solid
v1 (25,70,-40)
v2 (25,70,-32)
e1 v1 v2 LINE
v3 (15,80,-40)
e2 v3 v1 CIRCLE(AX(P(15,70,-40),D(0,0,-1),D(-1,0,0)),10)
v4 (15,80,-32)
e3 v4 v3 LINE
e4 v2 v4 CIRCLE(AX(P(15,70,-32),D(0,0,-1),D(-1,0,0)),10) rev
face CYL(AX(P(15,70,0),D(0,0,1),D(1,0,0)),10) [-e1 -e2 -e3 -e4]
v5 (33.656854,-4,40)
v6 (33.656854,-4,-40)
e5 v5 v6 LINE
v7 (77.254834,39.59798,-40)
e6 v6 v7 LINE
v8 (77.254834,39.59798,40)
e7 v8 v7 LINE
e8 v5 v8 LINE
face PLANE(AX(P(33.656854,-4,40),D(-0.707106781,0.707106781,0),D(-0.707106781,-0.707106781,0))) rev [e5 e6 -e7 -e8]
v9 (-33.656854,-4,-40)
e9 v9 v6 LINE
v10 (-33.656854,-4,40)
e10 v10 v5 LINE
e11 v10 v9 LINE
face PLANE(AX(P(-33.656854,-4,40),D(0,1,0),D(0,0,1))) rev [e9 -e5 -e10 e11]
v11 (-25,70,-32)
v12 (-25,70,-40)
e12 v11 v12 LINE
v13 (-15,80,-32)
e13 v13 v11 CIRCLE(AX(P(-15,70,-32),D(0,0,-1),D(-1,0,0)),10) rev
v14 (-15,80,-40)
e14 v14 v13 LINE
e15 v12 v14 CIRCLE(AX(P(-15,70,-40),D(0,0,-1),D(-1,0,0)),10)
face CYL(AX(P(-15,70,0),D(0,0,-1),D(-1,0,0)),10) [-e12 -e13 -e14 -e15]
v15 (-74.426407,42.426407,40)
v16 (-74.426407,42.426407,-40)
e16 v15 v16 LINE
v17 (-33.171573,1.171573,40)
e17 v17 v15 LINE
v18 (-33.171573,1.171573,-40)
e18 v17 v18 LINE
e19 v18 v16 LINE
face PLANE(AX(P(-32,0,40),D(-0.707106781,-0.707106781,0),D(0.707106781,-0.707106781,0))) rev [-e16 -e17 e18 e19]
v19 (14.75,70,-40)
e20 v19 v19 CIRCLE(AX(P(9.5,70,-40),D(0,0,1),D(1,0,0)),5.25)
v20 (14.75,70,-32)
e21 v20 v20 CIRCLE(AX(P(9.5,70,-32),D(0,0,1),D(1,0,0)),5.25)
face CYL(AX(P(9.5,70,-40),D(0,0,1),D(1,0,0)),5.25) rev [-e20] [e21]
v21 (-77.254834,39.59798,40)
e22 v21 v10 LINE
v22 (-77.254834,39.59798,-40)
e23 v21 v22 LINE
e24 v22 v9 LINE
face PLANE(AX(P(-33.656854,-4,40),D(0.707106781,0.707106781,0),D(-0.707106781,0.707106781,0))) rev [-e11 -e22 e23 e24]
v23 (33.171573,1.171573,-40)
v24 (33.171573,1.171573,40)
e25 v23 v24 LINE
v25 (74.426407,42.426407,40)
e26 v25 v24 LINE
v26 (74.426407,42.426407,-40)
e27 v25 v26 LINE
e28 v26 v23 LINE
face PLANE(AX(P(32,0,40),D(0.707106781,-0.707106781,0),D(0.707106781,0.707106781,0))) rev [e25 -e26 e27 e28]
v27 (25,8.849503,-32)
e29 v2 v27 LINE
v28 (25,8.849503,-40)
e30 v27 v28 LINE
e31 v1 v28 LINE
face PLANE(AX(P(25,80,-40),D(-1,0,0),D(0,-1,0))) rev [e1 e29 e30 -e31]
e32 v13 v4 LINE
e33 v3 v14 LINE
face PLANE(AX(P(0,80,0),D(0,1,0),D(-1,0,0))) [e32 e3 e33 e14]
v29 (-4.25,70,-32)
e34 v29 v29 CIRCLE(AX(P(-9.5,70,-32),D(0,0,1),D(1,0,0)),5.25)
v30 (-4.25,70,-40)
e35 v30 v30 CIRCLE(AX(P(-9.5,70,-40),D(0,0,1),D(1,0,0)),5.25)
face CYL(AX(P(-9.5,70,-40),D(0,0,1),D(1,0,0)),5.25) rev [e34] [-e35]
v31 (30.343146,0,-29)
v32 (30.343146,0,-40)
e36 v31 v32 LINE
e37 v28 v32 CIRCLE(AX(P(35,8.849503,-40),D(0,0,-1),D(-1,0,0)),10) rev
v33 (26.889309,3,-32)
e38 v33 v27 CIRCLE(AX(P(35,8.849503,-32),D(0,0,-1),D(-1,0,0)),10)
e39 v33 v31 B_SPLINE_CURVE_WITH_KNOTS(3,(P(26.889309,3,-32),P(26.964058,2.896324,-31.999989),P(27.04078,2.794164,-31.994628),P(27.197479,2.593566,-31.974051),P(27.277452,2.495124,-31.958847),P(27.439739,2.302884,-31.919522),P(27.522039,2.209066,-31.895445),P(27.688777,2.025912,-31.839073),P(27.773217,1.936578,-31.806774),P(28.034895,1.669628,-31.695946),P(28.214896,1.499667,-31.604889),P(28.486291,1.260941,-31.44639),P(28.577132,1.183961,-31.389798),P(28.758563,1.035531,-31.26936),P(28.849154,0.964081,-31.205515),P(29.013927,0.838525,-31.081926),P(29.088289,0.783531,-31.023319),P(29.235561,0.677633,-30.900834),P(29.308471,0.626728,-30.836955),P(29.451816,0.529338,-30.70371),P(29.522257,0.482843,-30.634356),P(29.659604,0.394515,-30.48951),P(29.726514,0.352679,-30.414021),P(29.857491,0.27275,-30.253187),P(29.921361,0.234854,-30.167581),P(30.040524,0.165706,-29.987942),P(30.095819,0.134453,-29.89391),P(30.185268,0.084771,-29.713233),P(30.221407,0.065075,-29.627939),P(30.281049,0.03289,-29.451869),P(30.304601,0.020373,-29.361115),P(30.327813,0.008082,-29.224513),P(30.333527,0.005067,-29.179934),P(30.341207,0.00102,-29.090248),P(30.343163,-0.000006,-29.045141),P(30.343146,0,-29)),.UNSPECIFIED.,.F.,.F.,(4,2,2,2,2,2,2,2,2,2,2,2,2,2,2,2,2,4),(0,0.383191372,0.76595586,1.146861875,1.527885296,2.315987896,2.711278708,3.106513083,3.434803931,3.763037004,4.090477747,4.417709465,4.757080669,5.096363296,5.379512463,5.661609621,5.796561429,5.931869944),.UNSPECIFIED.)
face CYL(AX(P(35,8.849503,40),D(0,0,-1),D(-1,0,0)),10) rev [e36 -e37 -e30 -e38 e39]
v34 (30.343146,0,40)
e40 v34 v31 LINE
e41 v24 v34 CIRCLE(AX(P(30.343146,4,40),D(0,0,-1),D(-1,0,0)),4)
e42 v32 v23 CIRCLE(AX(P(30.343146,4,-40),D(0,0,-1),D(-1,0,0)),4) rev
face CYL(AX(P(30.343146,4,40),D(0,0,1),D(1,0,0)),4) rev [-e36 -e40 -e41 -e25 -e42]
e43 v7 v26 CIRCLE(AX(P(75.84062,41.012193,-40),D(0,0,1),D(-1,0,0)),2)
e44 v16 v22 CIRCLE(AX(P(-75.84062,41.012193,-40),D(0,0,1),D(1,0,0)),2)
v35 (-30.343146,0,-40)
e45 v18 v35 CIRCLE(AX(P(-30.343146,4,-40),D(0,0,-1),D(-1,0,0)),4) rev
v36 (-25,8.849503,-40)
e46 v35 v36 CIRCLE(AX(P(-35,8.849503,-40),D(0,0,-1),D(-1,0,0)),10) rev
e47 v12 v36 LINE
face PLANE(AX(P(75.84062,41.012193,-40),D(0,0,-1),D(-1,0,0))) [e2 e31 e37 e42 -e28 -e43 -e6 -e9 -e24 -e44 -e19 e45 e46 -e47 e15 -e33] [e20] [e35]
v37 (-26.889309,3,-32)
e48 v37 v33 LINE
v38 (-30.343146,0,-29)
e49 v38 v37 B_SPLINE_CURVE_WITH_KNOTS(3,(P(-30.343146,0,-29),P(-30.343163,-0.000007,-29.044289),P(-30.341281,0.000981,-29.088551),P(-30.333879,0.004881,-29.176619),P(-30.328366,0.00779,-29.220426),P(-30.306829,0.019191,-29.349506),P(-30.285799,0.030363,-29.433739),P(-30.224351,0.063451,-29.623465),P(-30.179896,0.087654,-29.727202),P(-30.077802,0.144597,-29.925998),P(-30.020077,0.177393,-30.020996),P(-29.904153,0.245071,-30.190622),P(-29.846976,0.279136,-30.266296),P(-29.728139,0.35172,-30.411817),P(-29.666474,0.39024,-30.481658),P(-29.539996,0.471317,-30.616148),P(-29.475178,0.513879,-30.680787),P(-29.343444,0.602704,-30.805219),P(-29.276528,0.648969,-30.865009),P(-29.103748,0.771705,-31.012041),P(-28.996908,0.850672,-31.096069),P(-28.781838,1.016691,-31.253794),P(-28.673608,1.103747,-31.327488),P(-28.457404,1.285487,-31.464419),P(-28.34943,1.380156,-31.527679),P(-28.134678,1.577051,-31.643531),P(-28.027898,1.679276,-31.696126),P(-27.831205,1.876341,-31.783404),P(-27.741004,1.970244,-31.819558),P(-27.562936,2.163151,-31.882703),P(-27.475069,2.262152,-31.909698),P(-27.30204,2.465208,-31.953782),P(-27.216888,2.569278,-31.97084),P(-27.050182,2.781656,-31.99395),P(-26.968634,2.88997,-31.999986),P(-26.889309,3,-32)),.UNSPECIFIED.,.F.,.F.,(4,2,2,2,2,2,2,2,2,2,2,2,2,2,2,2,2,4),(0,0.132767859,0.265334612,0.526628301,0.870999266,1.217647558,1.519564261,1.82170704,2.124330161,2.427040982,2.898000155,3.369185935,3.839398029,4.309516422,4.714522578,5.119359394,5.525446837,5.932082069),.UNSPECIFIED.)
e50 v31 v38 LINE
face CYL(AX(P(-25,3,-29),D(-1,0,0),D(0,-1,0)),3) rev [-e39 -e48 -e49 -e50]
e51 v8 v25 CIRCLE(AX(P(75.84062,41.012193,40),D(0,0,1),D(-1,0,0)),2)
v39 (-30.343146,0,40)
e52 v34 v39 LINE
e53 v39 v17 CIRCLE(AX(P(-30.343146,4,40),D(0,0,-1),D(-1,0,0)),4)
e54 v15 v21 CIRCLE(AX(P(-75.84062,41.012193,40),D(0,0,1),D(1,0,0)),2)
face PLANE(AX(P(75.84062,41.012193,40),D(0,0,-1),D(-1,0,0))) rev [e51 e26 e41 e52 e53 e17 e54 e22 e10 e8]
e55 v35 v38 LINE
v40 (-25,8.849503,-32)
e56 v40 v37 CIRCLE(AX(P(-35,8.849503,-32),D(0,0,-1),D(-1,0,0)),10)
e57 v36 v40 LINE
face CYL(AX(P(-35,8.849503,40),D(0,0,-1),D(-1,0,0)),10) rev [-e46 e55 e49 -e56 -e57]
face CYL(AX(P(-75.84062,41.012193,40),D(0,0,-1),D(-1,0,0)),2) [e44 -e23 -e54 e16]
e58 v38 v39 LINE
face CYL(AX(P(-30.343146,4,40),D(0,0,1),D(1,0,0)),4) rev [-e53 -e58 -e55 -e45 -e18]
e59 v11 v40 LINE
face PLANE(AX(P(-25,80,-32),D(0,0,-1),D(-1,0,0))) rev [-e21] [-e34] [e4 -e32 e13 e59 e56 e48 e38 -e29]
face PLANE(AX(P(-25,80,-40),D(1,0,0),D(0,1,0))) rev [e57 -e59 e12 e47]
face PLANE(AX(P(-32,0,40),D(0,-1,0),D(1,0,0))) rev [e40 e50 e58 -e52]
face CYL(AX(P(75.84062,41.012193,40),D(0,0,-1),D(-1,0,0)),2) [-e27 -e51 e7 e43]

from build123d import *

# Parameters (mm, degrees)
BOSS_EXTRUDE2_DEPTH = 40
FILLET1_R           = 4
SKETCH3_W           = 50
SKETCH3_H           = 8
BOSS_EXTRUDE3_DEPTH = 80
SKETCH5_R           = 5.25
CUT_EXTRUDE1_DEPTH  = 133.827565624
FILLET2_R           = 10
FILLET3_R           = 3


with BuildPart() as part:
    # Sketch2 → Boss-Extrude2 (new, symmetric)
    with BuildSketch(Plane.XY):
        with BuildLine():
            Line((-32, 0), (32, 0))
            Line((32, 0), (74.426406871, 42.426406871))
            ThreePointArc((74.426406871, 42.426406871), (77.254833996, 42.426406871), (77.254833996, 39.597979746))
            Line((77.254833996, 39.597979746), (33.656854249, -4))
            Line((33.656854249, -4), (-33.656854249, -4))
            Line((-33.656854249, -4), (-77.254833996, 39.597979746))
            ThreePointArc((-77.254833996, 39.597979746), (-77.254833996, 42.426406871), (-74.426406871, 42.426406871))
            Line((-74.426406871, 42.426406871), (-32, 0))
        make_face()
    extrude(amount=BOSS_EXTRUDE2_DEPTH, both=True)

    # Fillet1
    fillet1_edges = [part.edges().sort_by_distance(p)[0] for p in [
        (-32, 0, 0),
        (32, 0, 0),
    ]]
    fillet(fillet1_edges, radius=FILLET1_R)

    # Sketch3 → Boss-Extrude3 (add)
    with BuildSketch(Plane(origin=(0, 0, 0), x_dir=(1, 0, 0), z_dir=(0, 1, 0))):
        with Locations((0, 36)):
            Rectangle(SKETCH3_W, SKETCH3_H)
    extrude(amount=BOSS_EXTRUDE3_DEPTH)

    # Sketch5 → Cut-Extrude1 (cut, through all)
    with BuildSketch(Plane.XY.offset(-32)):
        with Locations((-9.5, 70)):
            Circle(SKETCH5_R)
        with Locations((9.5, 70)):
            Circle(SKETCH5_R)
    extrude(amount=-CUT_EXTRUDE1_DEPTH, mode=Mode.SUBTRACT)

    # Fillet2
    # the kernel refuses this fillet: 10 mm, written as the material it adds along each edge
    with BuildSketch(Plane(origin=(25, 0, -40), x_dir=(1, 0, 0), z_dir=(0, 0, 1)), Plane(origin=(-25, 0, -32), x_dir=(-1, 0, 0), z_dir=(0, 0, -1))) as fillet2_piece_1:
        with BuildLine():
            CenterArc((10, 8.849503291), FILLET2_R, 180, 62.245409403)
            Line((0, 8.849503291), (0, 0))
            Line((0, 0), (5.343145751, 0))
        make_face()
    extrude(amount=8)
    # the kernel refuses this fillet: 10 mm, written as the material it takes off along each edge
    with BuildSketch(Plane(origin=(25, 80, -65), x_dir=(-1, 0, 0), z_dir=(0, 0, 1))) as fillet2_2_piece_1:
        with BuildLine():
            CenterArc((FILLET2_R, FILLET2_R), FILLET2_R, 180, 90)
            Line((0, FILLET2_R), (0, 0))
            Line((0, 0), (FILLET2_R, 0))
        make_face()
    extrude(amount=58, mode=Mode.SUBTRACT)
    with BuildSketch(Plane(origin=(-25, 80, -7), x_dir=(0, -1, 0), z_dir=(0, 0, -1))) as fillet2_2_piece_2:
        with BuildLine():
            CenterArc((FILLET2_R, -FILLET2_R), FILLET2_R, 90, 90)
            Line((0, -FILLET2_R), (0, 0))
            Line((0, 0), (FILLET2_R, 0))
        make_face()
    extrude(amount=58, mode=Mode.SUBTRACT)

    # Fillet3
    # the kernel refuses this fillet: 3 mm, written as the material it adds along each edge
    with BuildSketch(Plane(origin=(-37.843145751, 0, -32), x_dir=(0, 1, 0), z_dir=(1, 0, 0))) as fillet3_piece_1_section:
        with BuildLine():
            CenterArc((FILLET3_R, FILLET3_R), FILLET3_R, 180, 90)
            Line((0, FILLET3_R), (0, 0))
            Line((0, 0), (FILLET3_R, 0))
        make_face()
    fillet3_piece_1 = extrude(amount=75.686291501, mode=Mode.PRIVATE)
    fillet3_piece_1 = fillet3_piece_1 - Plane(origin=(35, 8.849503291, -32), x_dir=(1, 0, 0), z_dir=(0, 0, -1)) * Cylinder(10, 164, mode=Mode.PRIVATE)
    fillet3_piece_1 = fillet3_piece_1 - Plane(origin=(-35, 8.849503291, -32), x_dir=(-1, 0, 0), z_dir=(0, 0, 1)) * Cylinder(10, 164, mode=Mode.PRIVATE)
    add(fillet3_piece_1)


solid = part.part
